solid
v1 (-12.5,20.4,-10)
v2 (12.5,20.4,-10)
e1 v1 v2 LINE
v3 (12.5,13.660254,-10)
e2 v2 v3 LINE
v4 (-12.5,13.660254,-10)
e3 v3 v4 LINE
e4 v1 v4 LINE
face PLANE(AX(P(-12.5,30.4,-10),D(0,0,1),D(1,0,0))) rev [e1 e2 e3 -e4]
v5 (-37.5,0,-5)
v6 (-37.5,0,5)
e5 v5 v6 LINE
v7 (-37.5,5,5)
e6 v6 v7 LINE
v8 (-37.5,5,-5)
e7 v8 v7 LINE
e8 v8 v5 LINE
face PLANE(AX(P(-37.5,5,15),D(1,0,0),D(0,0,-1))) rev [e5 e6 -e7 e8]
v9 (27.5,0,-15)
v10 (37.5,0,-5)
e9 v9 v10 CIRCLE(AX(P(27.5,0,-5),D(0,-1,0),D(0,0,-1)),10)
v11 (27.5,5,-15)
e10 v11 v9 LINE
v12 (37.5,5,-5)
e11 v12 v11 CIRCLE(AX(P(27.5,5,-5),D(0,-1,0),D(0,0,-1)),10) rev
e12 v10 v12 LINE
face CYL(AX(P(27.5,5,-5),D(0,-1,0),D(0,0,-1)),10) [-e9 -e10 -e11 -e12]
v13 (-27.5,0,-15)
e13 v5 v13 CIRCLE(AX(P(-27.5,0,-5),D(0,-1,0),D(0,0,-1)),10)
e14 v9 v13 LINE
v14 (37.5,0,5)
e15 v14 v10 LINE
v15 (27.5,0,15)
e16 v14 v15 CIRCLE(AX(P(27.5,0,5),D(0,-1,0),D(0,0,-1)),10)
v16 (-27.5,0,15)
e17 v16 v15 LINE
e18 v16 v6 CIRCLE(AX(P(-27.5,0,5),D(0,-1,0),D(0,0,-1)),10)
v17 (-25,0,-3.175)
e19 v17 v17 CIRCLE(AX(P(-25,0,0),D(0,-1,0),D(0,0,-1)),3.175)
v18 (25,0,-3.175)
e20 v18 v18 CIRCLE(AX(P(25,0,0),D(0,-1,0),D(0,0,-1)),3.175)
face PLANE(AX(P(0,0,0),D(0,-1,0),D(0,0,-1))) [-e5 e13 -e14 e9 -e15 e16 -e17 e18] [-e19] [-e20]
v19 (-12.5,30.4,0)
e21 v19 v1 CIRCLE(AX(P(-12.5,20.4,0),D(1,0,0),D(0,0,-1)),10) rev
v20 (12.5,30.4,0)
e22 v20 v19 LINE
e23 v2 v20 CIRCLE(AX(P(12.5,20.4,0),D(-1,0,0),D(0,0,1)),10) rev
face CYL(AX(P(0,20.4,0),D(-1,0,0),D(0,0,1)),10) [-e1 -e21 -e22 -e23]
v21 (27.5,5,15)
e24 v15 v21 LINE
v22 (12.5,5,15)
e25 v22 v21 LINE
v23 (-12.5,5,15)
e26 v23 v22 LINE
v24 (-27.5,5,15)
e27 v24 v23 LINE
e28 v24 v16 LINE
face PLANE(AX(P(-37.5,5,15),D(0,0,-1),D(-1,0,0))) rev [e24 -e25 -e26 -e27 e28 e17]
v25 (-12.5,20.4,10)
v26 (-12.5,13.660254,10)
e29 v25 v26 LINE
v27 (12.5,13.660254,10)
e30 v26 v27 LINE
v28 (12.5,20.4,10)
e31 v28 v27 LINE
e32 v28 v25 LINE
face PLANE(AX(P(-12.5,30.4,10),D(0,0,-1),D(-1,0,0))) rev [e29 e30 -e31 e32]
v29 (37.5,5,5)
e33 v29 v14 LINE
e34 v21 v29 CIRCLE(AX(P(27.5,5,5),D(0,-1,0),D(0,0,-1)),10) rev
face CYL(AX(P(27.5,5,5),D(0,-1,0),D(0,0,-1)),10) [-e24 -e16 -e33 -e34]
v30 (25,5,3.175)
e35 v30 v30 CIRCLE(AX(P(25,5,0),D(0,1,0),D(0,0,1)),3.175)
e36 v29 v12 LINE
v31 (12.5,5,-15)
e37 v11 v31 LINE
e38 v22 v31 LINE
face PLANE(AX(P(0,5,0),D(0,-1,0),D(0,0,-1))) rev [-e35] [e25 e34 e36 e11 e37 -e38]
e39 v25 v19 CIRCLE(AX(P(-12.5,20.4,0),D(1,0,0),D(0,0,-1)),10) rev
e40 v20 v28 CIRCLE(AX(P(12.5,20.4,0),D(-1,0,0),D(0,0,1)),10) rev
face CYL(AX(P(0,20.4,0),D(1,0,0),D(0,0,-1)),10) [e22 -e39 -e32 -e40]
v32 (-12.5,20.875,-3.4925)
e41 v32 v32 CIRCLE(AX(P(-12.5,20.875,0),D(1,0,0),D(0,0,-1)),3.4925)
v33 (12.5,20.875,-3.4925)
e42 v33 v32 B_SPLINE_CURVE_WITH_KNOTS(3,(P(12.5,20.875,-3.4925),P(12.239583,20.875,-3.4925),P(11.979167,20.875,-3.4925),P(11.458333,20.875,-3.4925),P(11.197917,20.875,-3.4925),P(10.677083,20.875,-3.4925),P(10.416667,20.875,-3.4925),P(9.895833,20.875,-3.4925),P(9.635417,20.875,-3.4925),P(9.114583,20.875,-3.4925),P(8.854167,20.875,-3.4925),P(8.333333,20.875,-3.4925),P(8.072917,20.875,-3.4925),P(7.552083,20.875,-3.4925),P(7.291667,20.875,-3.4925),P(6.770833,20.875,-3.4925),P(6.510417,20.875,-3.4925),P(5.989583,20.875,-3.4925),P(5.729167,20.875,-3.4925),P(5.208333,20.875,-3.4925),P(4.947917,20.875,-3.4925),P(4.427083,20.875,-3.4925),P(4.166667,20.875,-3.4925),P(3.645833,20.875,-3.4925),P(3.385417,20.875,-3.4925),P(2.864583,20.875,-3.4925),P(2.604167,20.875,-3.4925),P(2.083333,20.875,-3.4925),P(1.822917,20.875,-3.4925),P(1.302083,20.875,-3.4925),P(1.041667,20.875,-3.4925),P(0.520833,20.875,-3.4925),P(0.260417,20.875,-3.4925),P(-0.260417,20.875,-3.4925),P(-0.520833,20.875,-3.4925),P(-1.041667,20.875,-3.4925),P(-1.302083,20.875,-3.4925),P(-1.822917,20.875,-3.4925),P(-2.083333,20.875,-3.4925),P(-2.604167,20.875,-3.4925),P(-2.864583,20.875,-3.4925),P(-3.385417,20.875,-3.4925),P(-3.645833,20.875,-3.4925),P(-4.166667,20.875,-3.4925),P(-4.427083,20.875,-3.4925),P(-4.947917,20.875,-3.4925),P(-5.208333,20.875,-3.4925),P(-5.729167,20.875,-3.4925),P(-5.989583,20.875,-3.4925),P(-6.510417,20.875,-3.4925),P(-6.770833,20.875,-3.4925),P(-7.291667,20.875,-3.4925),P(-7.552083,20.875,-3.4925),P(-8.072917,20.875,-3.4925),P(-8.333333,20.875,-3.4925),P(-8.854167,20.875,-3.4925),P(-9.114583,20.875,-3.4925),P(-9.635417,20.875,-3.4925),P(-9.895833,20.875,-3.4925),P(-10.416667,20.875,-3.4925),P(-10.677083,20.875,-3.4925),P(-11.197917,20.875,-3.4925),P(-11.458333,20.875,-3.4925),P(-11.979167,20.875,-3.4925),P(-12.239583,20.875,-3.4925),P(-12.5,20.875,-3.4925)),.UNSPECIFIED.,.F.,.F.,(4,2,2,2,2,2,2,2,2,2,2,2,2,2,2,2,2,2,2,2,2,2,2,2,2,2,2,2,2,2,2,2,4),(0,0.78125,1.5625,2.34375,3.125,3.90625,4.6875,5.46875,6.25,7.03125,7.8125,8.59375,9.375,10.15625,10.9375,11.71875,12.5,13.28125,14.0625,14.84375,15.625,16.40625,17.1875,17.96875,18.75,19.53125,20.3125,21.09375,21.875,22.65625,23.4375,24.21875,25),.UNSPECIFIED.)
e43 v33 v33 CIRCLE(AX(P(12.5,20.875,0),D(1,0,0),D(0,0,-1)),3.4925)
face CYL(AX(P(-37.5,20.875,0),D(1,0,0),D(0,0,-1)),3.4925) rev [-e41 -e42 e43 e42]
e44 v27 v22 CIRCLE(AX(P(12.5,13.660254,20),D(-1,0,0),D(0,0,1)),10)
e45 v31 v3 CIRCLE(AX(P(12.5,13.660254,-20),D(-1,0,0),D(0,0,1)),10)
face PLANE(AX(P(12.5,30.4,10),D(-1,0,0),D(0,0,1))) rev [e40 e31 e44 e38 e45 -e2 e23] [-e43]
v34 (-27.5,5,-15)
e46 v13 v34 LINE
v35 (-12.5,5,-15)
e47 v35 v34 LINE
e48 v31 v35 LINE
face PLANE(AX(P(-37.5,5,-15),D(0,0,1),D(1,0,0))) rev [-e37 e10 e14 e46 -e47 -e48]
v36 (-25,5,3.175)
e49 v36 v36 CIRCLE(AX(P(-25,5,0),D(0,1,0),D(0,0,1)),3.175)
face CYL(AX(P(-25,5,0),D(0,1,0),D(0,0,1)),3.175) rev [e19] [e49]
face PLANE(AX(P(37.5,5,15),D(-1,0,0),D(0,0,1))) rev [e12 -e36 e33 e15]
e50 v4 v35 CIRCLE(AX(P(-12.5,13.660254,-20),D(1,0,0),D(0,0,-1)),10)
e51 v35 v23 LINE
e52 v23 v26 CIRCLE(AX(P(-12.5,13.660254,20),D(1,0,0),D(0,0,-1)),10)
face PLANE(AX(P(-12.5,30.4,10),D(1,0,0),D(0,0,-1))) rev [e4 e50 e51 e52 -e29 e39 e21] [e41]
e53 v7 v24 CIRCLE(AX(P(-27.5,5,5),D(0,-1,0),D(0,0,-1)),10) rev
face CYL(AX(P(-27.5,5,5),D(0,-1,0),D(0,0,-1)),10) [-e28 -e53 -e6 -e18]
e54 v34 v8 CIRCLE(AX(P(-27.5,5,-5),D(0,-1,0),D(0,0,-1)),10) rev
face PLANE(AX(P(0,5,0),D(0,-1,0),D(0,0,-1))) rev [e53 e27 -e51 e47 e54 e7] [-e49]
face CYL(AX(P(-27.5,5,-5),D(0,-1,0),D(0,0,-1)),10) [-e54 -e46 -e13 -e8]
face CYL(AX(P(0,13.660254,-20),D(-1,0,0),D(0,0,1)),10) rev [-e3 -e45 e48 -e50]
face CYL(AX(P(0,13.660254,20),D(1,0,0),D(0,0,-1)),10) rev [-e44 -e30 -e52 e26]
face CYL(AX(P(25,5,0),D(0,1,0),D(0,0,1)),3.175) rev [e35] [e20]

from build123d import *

# Parameters (mm, degrees)
SKETCH1_W                   = 75
SKETCH1_H                   = 30
BOSS_EXTRUDE1_DEPTH         = 5
SKETCH2_W                   = 25
SKETCH2_H                   = 20
BOSS_EXTRUDE3_DEPTH         = 25.4
SKETCH3_R                   = 3.4925
CUT_EXTRUDE1_DEPTH          = 61.408277578
F_1_4_0_25_DIAMETER_HOLE2_D = 6.35
FILLET2_R                   = 10


with BuildPart() as part:
    # Sketch1 → Boss-Extrude1 (new body)
    with BuildSketch(Plane(origin=(0, 0, 0), x_dir=(1, 0, 0), z_dir=(0, 1, 0))):
        Rectangle(SKETCH1_W, SKETCH1_H)
    extrude(amount=BOSS_EXTRUDE1_DEPTH)

    # Sketch2 → Boss-Extrude3 (add)
    with BuildSketch(Plane(origin=(0, 5, 0), x_dir=(1, 0, 0), z_dir=(0, 1, 0))):
        Rectangle(SKETCH2_W, SKETCH2_H)
    extrude(amount=BOSS_EXTRUDE3_DEPTH)

    # Sketch3 → Cut-Extrude1 (cut, through all)
    with BuildSketch(Plane(origin=(12.5, 0, 0), x_dir=(0, 0, -1), z_dir=(1, 0, 0))):
        with Locations((0, 20.875)):
            Circle(SKETCH3_R)
    extrude(amount=-CUT_EXTRUDE1_DEPTH, mode=Mode.SUBTRACT)

    # 1/4 (0.25) Diameter Hole2 (through all)
    with Locations(Plane(origin=(0, 5, 0), x_dir=(1, 0, 0), z_dir=(0, 1, 0))):
        with Locations((-25, 0), (25, 0)):
            Hole(F_1_4_0_25_DIAMETER_HOLE2_D / 2)

    # Fillet2
    # the kernel refuses this fillet: 10 mm, written as the material it adds along each edge
    with BuildSketch(Plane(origin=(-12.5, 5, 10), x_dir=(0, 0, 1), z_dir=(1, 0, 0)), Plane(origin=(12.5, 5, -10), x_dir=(0, 0, -1), z_dir=(-1, 0, 0))) as fillet2_piece_1:
        with BuildLine():
            CenterArc((10, -8.660254038), FILLET2_R, 120, 60)
            Line((0, -8.660254038), (0, 0))
            Line((0, 0), (5, 0))
        make_face()
    extrude(amount=25)
    # the kernel refuses this fillet: 10 mm, written as the material it takes off along each edge
    with BuildSketch(Plane(origin=(-37.5, -25, -15), x_dir=(1, 0, 0), z_dir=(0, 1, 0)), Plane(origin=(37.5, -25, 15), x_dir=(-1, 0, 0), z_dir=(0, 1, 0))) as fillet2_2_piece_1:
        with BuildLine():
            CenterArc((FILLET2_R, -FILLET2_R), FILLET2_R, 90, 90)
            Line((0, -FILLET2_R), (0, 0))
            Line((0, 0), (FILLET2_R, 0))
        make_face()
    extrude(amount=55, mode=Mode.SUBTRACT)
    with BuildSketch(Plane(origin=(-37.5, -25, 15), x_dir=(1, 0, 0), z_dir=(0, 1, 0)), Plane(origin=(37.5, -25, -15), x_dir=(-1, 0, 0), z_dir=(0, 1, 0))) as fillet2_2_piece_2:
        with BuildLine():
            CenterArc((FILLET2_R, FILLET2_R), FILLET2_R, 180, 90)
            Line((0, FILLET2_R), (0, 0))
            Line((0, 0), (FILLET2_R, 0))
        make_face()
    extrude(amount=55, mode=Mode.SUBTRACT)
    with BuildSketch(Plane(origin=(-37.5, 30.4, 10), x_dir=(0, 0, -1), z_dir=(1, 0, 0)), Plane(origin=(37.5, 30.4, -10), x_dir=(0, 0, 1), z_dir=(-1, 0, 0))) as fillet2_2_piece_3:
        with BuildLine():
            CenterArc((FILLET2_R, -FILLET2_R), FILLET2_R, 90, 90)
            Line((0, -FILLET2_R), (0, 0))
            Line((0, 0), (FILLET2_R, 0))
        make_face()
    extrude(amount=75, mode=Mode.SUBTRACT)


solid = part.part
